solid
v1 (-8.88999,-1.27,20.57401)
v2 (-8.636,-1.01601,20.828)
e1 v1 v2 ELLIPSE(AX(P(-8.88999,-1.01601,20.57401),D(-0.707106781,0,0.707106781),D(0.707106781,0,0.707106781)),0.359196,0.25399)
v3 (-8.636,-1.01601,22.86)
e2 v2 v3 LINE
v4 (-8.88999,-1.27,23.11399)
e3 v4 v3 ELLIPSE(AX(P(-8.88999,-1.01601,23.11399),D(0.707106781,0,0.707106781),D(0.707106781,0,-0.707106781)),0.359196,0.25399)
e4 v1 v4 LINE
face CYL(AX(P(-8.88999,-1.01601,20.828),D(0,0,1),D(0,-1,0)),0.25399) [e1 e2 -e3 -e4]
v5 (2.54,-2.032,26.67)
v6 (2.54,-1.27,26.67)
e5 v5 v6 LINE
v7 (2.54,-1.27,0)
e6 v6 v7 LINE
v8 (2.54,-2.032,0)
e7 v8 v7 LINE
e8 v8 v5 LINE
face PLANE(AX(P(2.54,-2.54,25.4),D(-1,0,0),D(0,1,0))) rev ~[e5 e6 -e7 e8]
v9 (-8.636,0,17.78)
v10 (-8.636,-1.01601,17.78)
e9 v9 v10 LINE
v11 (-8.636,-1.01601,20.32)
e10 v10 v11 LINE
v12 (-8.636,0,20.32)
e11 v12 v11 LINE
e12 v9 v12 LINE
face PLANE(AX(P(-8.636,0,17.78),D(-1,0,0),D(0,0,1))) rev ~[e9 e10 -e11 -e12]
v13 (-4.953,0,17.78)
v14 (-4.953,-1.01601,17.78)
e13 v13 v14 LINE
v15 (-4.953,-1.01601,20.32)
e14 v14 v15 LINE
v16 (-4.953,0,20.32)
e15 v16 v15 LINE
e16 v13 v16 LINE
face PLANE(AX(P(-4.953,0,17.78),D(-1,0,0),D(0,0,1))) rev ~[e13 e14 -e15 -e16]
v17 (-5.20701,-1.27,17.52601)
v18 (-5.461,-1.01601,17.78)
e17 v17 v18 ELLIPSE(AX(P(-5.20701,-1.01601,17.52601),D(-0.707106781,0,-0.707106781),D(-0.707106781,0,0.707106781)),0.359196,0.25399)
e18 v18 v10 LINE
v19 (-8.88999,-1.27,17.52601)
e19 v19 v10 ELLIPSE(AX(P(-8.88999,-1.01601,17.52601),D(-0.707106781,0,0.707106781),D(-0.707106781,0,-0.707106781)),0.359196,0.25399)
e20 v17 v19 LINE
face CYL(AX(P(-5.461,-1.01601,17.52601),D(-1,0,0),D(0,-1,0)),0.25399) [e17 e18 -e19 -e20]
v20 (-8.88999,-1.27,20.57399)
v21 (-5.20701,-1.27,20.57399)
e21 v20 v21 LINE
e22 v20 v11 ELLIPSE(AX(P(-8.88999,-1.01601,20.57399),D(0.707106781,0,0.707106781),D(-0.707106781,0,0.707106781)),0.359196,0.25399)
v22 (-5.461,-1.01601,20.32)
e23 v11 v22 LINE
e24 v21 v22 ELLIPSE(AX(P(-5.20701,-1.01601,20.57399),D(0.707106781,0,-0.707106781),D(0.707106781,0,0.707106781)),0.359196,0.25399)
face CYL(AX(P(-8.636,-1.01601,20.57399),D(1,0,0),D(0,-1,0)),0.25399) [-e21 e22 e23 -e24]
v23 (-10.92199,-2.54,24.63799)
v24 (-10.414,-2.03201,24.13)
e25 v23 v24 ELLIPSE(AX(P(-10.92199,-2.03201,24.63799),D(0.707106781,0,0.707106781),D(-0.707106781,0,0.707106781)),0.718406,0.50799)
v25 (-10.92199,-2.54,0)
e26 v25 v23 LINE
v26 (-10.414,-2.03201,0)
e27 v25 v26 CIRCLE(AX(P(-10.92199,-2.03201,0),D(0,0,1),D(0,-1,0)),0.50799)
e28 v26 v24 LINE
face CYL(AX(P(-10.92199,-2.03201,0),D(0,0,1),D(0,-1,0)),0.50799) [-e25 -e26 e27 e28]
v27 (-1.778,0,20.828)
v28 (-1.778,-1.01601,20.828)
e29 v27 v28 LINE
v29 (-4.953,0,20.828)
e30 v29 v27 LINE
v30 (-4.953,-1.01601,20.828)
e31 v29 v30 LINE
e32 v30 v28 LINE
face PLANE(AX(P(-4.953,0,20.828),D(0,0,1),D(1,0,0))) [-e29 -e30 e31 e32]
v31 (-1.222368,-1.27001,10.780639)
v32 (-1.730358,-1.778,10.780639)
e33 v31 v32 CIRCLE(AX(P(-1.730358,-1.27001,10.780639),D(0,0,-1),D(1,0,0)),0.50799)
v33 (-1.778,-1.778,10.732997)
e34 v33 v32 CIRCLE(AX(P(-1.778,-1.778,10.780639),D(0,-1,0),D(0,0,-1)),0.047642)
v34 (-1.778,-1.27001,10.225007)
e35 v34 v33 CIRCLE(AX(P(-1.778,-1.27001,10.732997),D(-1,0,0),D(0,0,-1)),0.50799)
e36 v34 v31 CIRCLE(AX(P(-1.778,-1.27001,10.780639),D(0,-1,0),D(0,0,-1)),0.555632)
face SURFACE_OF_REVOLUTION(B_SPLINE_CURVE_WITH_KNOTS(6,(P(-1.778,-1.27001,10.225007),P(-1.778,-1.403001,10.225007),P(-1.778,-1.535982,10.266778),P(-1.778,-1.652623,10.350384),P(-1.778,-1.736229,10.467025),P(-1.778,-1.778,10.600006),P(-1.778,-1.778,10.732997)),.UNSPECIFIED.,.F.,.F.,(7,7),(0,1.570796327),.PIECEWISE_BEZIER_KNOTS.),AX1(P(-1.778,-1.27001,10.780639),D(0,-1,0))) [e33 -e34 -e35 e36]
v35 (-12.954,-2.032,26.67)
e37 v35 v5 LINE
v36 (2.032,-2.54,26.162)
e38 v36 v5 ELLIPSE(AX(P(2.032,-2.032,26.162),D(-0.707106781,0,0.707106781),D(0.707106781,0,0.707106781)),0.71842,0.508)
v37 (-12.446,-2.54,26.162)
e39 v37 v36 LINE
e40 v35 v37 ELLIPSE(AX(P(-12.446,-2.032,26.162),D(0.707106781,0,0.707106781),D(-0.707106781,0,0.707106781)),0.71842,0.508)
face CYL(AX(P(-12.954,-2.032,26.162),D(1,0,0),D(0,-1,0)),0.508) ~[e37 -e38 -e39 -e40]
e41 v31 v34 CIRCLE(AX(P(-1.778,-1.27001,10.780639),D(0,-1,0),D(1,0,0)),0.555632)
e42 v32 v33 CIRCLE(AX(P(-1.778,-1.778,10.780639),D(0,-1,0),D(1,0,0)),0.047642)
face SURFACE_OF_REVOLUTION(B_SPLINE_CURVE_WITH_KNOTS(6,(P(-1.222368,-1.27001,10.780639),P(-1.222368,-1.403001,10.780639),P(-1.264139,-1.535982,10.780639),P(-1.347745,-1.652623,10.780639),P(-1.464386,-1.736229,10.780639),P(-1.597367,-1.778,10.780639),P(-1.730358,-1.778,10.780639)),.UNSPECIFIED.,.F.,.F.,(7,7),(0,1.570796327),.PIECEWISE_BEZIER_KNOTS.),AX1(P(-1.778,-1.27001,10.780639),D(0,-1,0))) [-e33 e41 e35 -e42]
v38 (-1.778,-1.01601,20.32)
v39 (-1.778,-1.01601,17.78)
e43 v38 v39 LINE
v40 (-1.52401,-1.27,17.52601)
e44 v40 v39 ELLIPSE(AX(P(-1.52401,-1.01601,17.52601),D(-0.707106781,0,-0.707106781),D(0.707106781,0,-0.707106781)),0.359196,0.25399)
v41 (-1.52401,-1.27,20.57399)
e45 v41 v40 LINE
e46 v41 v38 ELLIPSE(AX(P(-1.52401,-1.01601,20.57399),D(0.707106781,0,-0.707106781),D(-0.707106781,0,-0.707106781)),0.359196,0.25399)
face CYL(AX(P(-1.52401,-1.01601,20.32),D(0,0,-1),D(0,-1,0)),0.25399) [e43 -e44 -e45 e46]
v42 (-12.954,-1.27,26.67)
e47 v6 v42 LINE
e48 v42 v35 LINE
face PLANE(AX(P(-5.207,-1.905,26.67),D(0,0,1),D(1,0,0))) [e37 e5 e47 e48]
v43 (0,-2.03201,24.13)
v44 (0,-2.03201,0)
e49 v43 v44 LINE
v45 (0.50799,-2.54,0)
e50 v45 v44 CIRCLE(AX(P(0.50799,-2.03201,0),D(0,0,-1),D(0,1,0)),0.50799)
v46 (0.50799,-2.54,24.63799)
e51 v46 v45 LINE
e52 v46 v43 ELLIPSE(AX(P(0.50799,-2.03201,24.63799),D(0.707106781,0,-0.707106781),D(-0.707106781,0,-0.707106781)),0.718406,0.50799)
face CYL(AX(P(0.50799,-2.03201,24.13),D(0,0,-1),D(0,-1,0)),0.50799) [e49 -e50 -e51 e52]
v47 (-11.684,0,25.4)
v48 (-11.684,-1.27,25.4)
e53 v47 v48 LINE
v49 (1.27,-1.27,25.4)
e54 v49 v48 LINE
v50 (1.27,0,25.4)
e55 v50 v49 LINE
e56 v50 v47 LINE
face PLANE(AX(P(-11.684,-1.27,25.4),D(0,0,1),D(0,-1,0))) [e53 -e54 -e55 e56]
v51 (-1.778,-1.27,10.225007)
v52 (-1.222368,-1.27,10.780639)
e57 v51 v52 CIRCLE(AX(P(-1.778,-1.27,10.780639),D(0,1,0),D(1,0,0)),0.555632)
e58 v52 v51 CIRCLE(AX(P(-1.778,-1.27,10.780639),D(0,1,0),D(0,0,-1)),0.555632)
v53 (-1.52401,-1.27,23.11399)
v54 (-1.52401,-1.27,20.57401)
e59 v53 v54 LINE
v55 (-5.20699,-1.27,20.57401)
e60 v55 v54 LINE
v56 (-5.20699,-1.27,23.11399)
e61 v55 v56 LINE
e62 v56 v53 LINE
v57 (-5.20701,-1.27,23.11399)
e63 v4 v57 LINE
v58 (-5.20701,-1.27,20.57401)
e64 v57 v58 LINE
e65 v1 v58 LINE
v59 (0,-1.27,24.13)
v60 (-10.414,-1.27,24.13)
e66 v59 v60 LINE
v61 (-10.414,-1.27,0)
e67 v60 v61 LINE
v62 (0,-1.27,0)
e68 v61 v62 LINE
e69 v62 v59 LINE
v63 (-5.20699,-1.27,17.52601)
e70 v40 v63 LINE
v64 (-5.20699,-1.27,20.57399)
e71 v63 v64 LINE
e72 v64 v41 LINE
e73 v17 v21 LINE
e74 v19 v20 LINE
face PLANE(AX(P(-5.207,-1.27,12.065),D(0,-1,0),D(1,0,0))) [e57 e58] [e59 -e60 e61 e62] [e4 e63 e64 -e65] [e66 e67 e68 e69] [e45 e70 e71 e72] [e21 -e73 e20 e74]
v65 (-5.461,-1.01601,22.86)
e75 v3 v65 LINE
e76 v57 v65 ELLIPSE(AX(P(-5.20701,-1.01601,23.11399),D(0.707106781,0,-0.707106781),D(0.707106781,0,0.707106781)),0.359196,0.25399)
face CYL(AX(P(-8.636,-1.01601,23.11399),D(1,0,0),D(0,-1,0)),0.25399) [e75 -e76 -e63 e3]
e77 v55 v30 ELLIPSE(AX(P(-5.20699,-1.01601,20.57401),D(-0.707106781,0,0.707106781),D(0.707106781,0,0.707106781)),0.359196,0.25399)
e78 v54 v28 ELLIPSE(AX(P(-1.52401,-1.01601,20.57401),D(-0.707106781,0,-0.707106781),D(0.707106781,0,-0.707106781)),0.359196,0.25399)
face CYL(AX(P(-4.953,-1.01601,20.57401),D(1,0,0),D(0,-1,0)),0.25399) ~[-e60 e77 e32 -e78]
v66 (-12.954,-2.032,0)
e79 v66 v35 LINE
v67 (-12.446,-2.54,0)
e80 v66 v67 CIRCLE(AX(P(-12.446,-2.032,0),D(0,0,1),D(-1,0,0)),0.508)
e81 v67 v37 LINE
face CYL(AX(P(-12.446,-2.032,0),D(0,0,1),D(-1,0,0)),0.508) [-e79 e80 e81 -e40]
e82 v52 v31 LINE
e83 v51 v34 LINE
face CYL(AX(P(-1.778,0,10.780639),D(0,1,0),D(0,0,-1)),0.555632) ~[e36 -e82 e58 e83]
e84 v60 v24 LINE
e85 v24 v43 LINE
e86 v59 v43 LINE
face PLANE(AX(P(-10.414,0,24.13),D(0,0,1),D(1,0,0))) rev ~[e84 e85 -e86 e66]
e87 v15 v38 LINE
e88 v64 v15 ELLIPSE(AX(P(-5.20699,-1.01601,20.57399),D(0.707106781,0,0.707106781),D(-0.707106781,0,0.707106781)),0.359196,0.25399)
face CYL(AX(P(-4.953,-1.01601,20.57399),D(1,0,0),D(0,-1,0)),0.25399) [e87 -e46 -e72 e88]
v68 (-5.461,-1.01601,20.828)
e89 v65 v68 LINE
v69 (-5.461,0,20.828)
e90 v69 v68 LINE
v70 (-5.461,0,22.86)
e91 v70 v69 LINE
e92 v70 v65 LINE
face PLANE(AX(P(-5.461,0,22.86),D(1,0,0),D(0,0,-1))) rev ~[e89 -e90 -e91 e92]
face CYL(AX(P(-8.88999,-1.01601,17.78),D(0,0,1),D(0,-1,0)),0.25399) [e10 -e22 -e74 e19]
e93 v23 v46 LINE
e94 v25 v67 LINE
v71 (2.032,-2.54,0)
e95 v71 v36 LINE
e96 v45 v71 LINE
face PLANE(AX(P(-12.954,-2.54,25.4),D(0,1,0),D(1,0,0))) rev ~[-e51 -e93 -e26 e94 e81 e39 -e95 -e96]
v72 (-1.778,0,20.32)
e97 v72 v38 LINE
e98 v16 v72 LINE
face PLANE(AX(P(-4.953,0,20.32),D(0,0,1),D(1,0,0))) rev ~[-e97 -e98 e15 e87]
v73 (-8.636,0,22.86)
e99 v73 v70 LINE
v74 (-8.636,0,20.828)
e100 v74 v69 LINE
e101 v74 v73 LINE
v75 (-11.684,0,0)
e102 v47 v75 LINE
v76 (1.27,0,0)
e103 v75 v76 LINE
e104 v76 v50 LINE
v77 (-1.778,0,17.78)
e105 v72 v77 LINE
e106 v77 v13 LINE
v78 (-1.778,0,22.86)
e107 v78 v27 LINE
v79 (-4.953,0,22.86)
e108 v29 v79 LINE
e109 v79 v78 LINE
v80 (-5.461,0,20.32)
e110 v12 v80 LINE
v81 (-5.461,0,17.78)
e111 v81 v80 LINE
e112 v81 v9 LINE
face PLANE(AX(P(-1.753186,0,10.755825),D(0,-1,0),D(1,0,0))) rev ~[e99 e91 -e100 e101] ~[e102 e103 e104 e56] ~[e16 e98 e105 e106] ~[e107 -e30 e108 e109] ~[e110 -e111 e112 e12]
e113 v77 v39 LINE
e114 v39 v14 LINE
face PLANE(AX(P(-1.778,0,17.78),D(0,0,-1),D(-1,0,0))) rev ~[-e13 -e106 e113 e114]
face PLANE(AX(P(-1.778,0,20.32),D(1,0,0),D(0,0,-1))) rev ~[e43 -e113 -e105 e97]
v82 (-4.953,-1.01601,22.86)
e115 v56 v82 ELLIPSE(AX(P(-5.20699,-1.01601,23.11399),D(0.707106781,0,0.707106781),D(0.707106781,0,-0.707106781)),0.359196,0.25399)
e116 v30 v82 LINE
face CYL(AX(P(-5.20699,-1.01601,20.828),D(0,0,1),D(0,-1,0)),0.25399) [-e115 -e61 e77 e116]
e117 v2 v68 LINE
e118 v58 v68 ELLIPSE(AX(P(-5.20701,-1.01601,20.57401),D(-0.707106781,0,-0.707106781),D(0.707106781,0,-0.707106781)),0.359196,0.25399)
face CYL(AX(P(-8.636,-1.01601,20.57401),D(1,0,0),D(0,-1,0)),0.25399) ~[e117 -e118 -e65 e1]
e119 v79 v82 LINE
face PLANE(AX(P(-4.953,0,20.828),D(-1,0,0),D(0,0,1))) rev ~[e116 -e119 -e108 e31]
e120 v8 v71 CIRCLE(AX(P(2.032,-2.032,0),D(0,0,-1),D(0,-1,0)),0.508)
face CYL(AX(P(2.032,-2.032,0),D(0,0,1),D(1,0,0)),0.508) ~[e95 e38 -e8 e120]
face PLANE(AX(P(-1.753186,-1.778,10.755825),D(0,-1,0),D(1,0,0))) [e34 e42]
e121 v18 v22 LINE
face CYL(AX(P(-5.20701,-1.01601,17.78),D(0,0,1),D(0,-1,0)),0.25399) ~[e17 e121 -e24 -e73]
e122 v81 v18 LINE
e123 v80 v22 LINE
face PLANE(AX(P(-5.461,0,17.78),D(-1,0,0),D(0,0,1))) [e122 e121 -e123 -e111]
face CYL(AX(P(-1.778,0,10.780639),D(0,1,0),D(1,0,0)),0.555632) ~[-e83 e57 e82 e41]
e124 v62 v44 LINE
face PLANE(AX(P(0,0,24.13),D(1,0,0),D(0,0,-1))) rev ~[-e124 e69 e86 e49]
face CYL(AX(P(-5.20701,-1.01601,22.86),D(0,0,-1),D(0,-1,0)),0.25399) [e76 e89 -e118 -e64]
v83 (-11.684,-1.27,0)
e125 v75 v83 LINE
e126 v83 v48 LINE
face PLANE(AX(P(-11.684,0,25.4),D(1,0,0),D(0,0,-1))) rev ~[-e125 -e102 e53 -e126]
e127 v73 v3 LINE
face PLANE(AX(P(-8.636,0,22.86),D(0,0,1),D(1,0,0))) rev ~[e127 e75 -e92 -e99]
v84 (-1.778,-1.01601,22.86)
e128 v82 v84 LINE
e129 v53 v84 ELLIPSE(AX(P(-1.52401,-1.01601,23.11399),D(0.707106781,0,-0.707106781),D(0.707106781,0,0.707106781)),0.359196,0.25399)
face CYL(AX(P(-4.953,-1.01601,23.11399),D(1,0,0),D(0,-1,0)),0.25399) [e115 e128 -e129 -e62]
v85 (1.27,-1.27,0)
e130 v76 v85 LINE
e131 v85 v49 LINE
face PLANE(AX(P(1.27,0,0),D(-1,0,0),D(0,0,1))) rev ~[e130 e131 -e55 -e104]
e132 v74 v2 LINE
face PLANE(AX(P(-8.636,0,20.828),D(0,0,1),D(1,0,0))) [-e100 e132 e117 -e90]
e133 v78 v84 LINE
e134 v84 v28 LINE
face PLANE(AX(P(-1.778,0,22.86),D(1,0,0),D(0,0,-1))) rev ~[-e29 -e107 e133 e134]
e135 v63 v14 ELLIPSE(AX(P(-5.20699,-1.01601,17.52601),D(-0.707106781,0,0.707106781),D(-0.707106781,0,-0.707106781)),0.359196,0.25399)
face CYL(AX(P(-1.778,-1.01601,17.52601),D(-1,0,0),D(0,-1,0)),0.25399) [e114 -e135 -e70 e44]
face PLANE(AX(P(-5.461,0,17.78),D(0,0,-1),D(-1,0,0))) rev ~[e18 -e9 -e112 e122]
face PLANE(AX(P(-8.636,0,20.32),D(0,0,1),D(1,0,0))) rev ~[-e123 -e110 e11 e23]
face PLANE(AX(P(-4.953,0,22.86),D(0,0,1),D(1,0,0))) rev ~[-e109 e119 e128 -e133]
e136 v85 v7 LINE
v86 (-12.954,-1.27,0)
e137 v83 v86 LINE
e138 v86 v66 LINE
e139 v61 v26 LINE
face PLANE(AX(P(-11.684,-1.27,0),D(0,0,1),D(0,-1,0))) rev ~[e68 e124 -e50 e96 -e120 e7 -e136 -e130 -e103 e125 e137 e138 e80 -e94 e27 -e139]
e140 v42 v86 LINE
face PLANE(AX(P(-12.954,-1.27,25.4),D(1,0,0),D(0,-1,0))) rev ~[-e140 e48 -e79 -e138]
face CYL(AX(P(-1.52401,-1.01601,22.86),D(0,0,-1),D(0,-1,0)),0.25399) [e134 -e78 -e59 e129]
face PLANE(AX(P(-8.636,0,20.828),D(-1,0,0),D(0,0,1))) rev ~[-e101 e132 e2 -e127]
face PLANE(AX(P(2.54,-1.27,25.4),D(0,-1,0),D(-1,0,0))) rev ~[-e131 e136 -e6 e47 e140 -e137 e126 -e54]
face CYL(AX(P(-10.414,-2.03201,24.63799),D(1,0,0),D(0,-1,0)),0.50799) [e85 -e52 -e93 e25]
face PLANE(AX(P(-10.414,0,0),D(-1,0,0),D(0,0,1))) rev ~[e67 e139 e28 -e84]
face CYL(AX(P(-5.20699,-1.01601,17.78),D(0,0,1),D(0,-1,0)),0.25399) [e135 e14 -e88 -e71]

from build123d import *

# Parameters (mm, degrees)
F1_DEPTH  = 2.54
F0_W      = 0.508
F0_H      = 0.508
F0_H_2    = 2.032
F0_W_2    = 3.175
F0_H_3    = 2.54
F2_DEPTH  = 1.27
F3_DEPTH  = 1.778
F4_R      = 0.50799
F5_R      = 0.25399
F6_W      = 1.27
F6_H      = 25.4
F7_DEPTH  = 1.27
F8_W      = 1.27
F8_H      = 25.4
F9_DEPTH  = 1.27
F11_DEPTH = 1.27
F12_R     = 0.508


# Not quite as in the source:
# - a fillet or chamfer is up to 0.001 mm smaller than in the source, because OpenCascade refuses the exact size


with BuildPart() as f1:
    # F0 (on Front) → F1 (new body)
    with BuildSketch(Plane.XZ):
        Polygon((0, 24.13), (0, 0), (1.27, 0), (1.27, 25.4), (-11.684, 25.4), (-11.684, 0), (-10.414, 0), (-10.414, 24.13), align=None)
    extrude(amount=F1_DEPTH)

    # F0 (on Front) → F2 (join)
    with BuildSketch(Plane.XZ):
        Polygon((-1.778, 0), (0, 0), (0, 24.13), (-10.414, 24.13), (-10.414, 0), align=None)
        with BuildLine():
            ThreePointArc((-1.2223680419, 10.7806390151), (-1.3851088746, 10.3877478897), (-1.778, 10.2250070571))
            ThreePointArc((-1.778, 10.2250070571), (-2.1708911254, 11.1735301405), (-1.2223680419, 10.7806390151))
        make_face(mode=Mode.SUBTRACT)
        Polygon((-4.953, 22.86), (-1.778, 22.86), (-1.778, 20.828), (-1.778, 20.32), (-1.778, 17.78), (-4.953, 17.78), (-5.461, 17.78), (-8.636, 17.78), (-8.636, 20.32), (-8.636, 20.828), (-8.636, 22.86), (-5.461, 22.86), align=None, mode=Mode.SUBTRACT)
        with Locations((-5.207, 20.574)):
            Rectangle(F0_W, F0_H)
        with Locations((-5.207, 21.844)):
            Rectangle(F0_W, F0_H_2)
        with Locations((-7.0485, 20.574)):
            Rectangle(F0_W_2, F0_H)
        with Locations((-5.207, 19.05)):
            Rectangle(F0_W, F0_H_3)
        with Locations((-3.3655, 20.574)):
            Rectangle(F0_W_2, F0_H)
        with BuildLine():
            ThreePointArc((-1.2223680419, 10.7806390151), (-2.1708911254, 11.1735301405), (-1.778, 10.2250070571))
            ThreePointArc((-1.778, 10.2250070571), (-1.3851088746, 10.3877478897), (-1.2223680419, 10.7806390151))
        make_face()
    extrude(amount=F2_DEPTH)

    # F0 (on Front) → F3 (join)
    with BuildSketch(Plane.XZ):
        with BuildLine():
            ThreePointArc((-1.2223680419, 10.7806390151), (-2.1708911254, 11.1735301405), (-1.778, 10.2250070571))
            ThreePointArc((-1.778, 10.2250070571), (-1.3851088746, 10.3877478897), (-1.2223680419, 10.7806390151))
        make_face()
    extrude(amount=F3_DEPTH)

    # F4 (radius 0.508 in the source; OpenCascade refuses exactly that, so slightly less here)
    f4_edges = [f1.edges().sort_by_distance(p)[0] for p in [
        (-10.414, -2.54, 12.065),
        (0, -2.54, 12.065),
        (-5.207, -2.54, 24.13),
        (-1.778, -1.778, 11.336271),
    ]]
    fillet(f4_edges, radius=F4_R)

    # F5 (radius 0.254 in the source; OpenCascade refuses exactly that, so slightly less here)
    f5_edges = [f1.edges().sort_by_distance(p)[0] for p in [
        (-3.3655, -1.27, 22.86),
        (-1.778, -1.27, 21.844),
        (-3.3655, -1.27, 20.828),
        (-1.778, -1.27, 19.05),
        (-3.3655, -1.27, 17.78),
        (-7.0485, -1.27, 17.78),
        (-5.461, -1.27, 19.05),
        (-7.0485, -1.27, 22.86),
        (-8.636, -1.27, 21.844),
        (-8.636, -1.27, 19.05),
        (-7.0485, -1.27, 20.32),
        (-4.953, -1.27, 21.844),
        (-7.0485, -1.27, 20.828),
        (-5.461, -1.27, 21.844),
        (-4.953, -1.27, 19.05),
        (-3.3655, -1.27, 20.32),
    ]]
    fillet(f5_edges, radius=F5_R)

    # F6 (on face) → F7 (join)
    with BuildSketch(Plane.YZ.offset(1.27)):
        with Locations((-1.905, 12.7)):
            Rectangle(F6_W, F6_H)
    extrude(amount=F7_DEPTH)

    # F8 (on face) → F9 (join)
    with BuildSketch(Plane(origin=(-11.684, 0, 0), x_dir=(0, -1, 0), z_dir=(-1, 0, 0))):
        with Locations((1.905, 12.7)):
            Rectangle(F8_W, F8_H)
    extrude(amount=F9_DEPTH)

    # F10 (on face) → F11 (join)
    with BuildSketch(Plane.XY.offset(25.4)):
        Polygon((-12.954, -1.27), (-12.954, -2.54), (2.54, -2.54), (2.54, -1.27), (1.27, -1.27), (-11.684, -1.27), align=None)
    extrude(amount=F11_DEPTH)

    # F12
    f12_edges = [f1.edges().sort_by_distance(p)[0] for p in [
        (-12.954, -2.54, 13.335),
        (-5.207, -2.54, 26.67),
        (2.54, -2.54, 13.335),
    ]]
    fillet(f12_edges, radius=F12_R)


solid = f1.part
